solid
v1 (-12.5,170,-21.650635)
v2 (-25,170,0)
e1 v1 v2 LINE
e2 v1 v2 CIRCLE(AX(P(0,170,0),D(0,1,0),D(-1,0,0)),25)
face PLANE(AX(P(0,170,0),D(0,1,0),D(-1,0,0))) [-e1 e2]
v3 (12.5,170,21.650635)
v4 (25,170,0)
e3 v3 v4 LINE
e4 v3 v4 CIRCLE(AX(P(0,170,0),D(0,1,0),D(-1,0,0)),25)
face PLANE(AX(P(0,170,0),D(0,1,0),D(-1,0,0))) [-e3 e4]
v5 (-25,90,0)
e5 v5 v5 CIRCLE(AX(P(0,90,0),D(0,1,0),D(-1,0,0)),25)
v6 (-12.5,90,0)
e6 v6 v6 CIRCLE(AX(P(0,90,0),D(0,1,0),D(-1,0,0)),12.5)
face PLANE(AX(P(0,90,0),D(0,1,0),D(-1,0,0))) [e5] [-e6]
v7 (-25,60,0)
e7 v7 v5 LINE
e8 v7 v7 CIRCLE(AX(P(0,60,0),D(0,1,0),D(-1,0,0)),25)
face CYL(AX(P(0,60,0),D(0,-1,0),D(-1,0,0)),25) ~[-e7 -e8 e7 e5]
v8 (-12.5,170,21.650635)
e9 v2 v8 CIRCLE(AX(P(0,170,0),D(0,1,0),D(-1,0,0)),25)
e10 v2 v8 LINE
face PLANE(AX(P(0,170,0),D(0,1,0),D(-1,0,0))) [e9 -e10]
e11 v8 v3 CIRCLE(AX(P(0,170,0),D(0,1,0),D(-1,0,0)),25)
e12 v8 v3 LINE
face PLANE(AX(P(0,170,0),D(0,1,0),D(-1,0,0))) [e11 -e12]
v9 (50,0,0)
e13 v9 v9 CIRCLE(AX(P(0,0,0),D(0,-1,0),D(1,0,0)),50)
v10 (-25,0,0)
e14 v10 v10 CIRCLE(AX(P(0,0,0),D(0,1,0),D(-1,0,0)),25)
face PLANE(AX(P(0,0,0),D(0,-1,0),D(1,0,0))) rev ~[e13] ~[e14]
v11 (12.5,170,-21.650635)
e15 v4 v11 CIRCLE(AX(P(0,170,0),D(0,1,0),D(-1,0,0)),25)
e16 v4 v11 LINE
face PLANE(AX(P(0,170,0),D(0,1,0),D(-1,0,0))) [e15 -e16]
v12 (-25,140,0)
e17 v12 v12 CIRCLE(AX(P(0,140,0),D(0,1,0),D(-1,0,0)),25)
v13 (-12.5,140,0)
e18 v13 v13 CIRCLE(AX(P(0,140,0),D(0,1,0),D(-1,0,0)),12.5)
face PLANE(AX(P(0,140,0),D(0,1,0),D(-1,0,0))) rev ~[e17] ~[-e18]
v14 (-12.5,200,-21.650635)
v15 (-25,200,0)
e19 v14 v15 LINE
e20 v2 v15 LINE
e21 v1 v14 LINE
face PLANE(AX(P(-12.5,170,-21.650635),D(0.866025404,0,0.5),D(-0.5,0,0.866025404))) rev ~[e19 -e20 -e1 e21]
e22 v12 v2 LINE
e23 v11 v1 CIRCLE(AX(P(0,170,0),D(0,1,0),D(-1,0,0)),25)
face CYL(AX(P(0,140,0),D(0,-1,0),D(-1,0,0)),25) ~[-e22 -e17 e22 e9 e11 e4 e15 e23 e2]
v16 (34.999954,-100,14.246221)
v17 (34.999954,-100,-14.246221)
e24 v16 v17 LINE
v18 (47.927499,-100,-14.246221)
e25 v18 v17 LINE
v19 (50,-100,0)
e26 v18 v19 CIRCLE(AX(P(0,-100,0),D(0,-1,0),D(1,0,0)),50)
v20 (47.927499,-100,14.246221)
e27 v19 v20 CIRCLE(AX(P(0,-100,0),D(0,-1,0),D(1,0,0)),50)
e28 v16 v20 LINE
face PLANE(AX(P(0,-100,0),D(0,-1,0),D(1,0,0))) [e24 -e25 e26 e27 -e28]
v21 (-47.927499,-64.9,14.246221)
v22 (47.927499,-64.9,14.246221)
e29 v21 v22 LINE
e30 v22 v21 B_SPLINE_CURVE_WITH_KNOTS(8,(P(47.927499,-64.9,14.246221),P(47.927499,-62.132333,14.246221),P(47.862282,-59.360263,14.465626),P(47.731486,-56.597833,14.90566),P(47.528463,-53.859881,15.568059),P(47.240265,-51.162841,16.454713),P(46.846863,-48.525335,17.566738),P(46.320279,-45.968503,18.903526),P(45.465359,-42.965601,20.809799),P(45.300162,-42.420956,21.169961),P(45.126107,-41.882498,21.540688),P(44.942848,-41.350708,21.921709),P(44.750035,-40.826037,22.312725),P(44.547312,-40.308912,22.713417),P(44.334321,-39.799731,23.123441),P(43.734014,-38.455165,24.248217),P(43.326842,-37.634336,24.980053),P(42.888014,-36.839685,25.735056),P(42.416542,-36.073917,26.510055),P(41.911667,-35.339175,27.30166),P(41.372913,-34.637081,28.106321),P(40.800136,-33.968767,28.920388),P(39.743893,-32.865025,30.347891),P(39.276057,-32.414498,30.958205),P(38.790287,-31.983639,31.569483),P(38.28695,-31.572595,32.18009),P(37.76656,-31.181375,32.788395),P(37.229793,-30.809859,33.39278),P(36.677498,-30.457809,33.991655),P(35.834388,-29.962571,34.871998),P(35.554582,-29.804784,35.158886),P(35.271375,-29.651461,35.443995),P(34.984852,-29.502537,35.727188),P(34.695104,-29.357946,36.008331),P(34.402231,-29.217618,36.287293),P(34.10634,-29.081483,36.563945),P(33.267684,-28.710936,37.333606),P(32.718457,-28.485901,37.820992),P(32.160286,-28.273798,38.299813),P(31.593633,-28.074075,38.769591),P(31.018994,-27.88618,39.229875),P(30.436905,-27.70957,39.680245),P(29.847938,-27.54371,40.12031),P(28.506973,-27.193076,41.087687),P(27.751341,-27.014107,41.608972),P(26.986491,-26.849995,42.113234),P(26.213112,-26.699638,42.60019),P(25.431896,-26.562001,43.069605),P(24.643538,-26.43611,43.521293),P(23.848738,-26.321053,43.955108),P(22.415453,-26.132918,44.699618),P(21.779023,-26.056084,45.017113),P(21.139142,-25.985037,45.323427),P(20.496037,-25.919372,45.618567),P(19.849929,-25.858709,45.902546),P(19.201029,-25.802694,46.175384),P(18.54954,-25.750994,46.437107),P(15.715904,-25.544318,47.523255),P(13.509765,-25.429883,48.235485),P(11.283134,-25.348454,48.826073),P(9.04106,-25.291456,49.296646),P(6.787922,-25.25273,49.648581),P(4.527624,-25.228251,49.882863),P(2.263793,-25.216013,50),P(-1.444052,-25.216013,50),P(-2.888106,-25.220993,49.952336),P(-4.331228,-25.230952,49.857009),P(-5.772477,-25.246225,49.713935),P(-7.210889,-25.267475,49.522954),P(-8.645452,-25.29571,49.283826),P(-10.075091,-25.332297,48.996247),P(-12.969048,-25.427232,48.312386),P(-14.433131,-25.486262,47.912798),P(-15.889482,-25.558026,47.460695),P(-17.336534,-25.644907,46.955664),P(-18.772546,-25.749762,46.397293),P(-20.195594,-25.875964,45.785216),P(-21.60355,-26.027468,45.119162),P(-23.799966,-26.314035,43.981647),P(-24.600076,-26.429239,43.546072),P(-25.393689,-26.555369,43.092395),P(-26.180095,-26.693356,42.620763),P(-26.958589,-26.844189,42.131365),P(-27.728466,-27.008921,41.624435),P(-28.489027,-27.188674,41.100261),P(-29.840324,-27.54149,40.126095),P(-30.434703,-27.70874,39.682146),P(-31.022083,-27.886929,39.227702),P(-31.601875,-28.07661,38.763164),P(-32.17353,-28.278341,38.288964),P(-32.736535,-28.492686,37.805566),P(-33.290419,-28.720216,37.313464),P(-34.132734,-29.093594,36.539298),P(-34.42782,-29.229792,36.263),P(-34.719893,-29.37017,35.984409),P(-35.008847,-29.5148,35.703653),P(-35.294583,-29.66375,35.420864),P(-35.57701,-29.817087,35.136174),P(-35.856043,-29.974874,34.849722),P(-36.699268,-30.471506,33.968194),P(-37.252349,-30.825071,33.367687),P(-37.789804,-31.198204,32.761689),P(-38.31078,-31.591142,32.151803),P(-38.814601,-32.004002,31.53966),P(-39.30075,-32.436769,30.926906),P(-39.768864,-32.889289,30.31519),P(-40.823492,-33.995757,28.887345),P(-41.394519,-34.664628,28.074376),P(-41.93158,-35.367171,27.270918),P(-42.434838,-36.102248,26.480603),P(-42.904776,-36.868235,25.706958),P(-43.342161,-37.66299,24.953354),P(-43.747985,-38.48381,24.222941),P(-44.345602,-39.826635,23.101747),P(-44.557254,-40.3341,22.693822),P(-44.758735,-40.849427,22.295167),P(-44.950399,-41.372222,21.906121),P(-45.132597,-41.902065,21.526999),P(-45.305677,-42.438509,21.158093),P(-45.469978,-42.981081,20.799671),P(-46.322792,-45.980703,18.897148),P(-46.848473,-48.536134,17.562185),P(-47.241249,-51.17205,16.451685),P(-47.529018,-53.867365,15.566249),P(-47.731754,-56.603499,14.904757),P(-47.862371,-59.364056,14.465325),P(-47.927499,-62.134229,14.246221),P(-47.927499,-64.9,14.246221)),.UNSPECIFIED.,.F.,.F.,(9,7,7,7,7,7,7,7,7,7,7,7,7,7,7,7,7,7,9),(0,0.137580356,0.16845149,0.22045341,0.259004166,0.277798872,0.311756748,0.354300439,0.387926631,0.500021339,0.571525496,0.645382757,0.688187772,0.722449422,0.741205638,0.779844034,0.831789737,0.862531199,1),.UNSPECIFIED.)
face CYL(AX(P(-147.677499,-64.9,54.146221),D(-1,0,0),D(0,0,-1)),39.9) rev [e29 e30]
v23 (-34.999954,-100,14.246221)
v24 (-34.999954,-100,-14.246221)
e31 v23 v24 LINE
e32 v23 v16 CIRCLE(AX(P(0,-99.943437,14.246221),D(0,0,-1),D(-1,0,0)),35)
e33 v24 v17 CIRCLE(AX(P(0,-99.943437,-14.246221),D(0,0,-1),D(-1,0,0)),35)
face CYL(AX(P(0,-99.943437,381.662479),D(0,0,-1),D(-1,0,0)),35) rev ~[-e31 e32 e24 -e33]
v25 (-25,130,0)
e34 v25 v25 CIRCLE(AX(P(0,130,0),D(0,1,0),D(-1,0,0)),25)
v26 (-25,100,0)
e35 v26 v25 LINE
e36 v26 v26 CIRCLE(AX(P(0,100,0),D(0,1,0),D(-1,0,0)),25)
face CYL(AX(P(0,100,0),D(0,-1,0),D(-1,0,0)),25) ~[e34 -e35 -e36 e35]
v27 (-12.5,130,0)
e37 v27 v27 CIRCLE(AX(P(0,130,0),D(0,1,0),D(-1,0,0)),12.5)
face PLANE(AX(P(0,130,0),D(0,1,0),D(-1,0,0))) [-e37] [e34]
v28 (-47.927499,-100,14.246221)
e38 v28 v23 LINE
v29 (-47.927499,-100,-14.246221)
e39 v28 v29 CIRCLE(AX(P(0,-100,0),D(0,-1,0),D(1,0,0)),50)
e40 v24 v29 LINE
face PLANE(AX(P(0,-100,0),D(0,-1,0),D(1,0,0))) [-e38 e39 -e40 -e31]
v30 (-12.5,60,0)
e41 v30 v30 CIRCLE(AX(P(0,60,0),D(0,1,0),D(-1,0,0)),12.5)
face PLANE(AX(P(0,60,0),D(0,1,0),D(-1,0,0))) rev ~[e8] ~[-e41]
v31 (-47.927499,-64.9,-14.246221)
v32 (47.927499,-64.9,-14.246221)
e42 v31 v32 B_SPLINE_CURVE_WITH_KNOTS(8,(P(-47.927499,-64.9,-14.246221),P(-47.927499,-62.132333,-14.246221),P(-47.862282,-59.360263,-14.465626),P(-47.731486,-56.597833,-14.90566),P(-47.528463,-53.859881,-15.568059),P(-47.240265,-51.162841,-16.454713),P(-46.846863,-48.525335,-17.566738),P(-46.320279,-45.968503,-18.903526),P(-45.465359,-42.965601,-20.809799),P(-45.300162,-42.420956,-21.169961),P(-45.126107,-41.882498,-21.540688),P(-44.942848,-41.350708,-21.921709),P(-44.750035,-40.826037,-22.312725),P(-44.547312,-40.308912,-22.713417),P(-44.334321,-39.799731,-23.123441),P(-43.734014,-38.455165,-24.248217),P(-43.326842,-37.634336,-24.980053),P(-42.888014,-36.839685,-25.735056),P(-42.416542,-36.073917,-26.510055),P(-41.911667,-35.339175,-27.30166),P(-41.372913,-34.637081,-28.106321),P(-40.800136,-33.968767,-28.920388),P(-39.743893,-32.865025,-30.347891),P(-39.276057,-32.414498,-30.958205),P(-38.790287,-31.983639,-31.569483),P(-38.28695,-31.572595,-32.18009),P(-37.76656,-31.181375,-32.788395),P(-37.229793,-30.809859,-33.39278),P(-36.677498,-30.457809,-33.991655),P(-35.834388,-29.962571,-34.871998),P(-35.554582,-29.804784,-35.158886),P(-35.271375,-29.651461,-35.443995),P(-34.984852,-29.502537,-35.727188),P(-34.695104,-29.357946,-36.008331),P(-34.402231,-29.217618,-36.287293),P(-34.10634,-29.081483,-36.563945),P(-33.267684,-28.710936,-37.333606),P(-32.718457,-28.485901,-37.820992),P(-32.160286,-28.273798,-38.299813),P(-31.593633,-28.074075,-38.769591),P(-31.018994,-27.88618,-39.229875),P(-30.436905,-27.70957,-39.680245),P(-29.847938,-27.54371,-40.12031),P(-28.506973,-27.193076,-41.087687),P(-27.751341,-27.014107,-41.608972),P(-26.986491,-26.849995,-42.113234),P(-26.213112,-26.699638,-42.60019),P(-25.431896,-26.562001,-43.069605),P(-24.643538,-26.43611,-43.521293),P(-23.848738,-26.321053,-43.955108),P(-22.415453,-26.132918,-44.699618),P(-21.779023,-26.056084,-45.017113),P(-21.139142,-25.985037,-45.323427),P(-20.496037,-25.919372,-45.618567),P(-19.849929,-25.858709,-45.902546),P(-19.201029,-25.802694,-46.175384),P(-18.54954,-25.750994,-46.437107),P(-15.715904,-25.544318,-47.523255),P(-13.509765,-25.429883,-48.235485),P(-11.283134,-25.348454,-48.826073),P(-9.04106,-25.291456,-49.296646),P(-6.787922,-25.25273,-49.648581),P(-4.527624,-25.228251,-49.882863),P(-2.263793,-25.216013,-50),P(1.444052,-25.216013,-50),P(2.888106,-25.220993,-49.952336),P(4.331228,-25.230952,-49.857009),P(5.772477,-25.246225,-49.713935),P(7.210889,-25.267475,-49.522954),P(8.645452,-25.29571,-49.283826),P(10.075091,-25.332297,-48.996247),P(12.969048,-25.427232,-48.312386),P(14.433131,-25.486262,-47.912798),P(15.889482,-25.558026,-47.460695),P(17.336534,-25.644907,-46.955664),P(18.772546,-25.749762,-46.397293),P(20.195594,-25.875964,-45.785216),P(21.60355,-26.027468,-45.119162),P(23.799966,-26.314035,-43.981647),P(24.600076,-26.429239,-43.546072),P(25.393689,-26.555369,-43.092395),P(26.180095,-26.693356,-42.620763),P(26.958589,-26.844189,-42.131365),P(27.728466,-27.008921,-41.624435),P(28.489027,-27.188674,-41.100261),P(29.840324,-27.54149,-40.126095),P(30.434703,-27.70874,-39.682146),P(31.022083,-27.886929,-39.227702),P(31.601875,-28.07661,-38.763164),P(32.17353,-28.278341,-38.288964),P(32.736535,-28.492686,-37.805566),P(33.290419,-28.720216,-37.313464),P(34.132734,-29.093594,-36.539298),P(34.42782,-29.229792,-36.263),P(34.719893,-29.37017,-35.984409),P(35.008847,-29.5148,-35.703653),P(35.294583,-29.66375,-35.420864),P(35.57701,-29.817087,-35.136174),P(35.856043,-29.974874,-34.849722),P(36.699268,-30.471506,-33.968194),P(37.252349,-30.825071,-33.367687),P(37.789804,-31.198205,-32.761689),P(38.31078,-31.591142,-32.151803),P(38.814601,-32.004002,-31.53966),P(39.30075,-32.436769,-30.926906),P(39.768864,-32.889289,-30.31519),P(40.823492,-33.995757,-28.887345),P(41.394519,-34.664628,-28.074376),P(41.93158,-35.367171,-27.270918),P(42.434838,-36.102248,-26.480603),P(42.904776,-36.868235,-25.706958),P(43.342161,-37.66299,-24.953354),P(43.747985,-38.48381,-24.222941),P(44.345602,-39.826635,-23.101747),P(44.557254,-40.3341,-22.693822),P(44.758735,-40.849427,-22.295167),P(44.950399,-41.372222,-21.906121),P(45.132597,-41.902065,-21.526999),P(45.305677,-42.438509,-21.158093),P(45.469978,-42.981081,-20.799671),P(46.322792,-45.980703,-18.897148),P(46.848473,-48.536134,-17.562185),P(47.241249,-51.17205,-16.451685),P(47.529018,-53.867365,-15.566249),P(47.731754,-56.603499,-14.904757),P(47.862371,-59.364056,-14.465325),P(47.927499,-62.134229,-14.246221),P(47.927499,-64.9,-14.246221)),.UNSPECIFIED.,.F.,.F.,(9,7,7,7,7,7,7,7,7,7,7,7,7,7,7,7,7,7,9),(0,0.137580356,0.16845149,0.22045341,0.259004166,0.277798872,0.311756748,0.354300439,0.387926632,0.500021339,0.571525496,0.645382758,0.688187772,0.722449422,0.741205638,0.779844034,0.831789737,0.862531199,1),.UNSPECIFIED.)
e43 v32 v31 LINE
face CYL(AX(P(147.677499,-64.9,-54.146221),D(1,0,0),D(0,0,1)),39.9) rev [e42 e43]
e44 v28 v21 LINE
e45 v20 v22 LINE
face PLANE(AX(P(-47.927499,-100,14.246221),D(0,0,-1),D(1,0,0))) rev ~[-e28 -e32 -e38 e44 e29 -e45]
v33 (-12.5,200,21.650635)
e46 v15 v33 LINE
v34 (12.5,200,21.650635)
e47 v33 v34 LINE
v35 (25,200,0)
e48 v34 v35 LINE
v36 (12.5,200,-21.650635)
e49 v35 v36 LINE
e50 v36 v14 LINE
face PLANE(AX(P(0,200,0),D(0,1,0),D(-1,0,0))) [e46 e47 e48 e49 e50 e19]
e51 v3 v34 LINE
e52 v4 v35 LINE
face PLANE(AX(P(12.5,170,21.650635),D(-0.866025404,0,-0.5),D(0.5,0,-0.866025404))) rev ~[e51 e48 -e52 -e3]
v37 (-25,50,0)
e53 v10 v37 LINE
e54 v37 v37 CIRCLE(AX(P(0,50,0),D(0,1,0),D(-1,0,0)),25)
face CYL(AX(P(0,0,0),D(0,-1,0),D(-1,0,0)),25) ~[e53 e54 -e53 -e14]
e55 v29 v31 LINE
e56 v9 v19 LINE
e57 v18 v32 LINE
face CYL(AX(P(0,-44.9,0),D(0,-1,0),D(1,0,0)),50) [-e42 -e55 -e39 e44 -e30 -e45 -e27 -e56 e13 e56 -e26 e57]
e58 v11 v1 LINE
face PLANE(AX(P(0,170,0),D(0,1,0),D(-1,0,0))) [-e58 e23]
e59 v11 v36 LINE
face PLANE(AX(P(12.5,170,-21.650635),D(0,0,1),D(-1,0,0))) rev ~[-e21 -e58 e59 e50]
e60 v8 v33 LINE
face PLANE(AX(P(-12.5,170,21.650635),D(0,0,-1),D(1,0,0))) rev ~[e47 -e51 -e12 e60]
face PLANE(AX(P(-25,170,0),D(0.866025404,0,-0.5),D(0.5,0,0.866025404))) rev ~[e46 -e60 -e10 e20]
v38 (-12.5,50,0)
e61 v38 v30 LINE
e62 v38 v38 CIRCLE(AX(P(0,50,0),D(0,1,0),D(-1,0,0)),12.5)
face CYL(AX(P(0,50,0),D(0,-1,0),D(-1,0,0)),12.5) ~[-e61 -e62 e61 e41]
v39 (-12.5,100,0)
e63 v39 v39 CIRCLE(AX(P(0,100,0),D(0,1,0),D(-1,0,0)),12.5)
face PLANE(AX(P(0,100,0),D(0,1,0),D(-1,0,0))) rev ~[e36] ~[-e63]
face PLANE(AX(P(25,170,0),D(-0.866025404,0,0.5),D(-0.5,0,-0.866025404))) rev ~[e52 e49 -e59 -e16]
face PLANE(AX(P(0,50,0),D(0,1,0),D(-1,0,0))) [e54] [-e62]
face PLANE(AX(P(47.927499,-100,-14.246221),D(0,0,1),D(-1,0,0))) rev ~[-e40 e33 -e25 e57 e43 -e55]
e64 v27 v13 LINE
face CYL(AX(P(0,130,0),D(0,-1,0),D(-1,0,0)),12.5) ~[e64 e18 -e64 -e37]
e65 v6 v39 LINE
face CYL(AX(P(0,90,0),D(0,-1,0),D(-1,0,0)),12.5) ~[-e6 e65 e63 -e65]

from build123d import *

# Parameters (mm, degrees)
F0_R          = 50
F1_DEPTH      = 100
F2_R          = 25
F3_DEPTH      = 50
F4_R          = 12.5
F5_DEPTH      = 10
F6_R          = 25
F7_DEPTH      = 30
F8_R          = 12.5
F9_DEPTH      = 10
F10_R         = 25
F11_DEPTH     = 30
F12_R         = 12.5
F13_DEPTH     = 10
F14_R         = 25
F15_DEPTH     = 30
F17_DEPTH     = 30
F20_D         = 70
F22_DEPTH     = 75
F23_T4_DEPTH  = 295.3549985752
F23_S5_R      = 50
F23_T6_DEPTH  = 152
F23_T10_DEPTH = 295.3549985752
F23_S11_R     = 50
F23_T12_DEPTH = 152


# Not quite as in the source:
# - a fillet or chamfer that OpenCascade refuses, or shapes differently, is made with other operations: its cross-section is extruded or revolved along the edge and cut away or added


with BuildPart() as f1:
    # F0 (on Front) → F1 (new body)
    with BuildSketch(Plane.XZ):
        Circle(F0_R)
    extrude(amount=F1_DEPTH)

    # F2 (on face) → F3 (join)
    with BuildSketch(Plane(origin=(0, 0, 0), x_dir=(-1, 0, 0), z_dir=(0, 1, 0))):
        Circle(F2_R)
    extrude(amount=F3_DEPTH)

    # F4 (on face) → F5 (join)
    with BuildSketch(Plane(origin=(0, 50, 0), x_dir=(-1, 0, 0), z_dir=(0, 1, 0))):
        Circle(F4_R)
    extrude(amount=F5_DEPTH)

    # F6 (on face) → F7 (join)
    with BuildSketch(Plane(origin=(0, 60, 0), x_dir=(-1, 0, 0), z_dir=(0, 1, 0))):
        Circle(F6_R)
    extrude(amount=F7_DEPTH)

    # F8 (on face) → F9 (join)
    with BuildSketch(Plane(origin=(0, 90, 0), x_dir=(-1, 0, 0), z_dir=(0, 1, 0))):
        Circle(F8_R)
    extrude(amount=F9_DEPTH)

    # F10 (on face) → F11 (join)
    with BuildSketch(Plane(origin=(0, 100, 0), x_dir=(-1, 0, 0), z_dir=(0, 1, 0))):
        Circle(F10_R)
    extrude(amount=F11_DEPTH)

    # F12 (on face) → F13 (join)
    with BuildSketch(Plane(origin=(0, 130, 0), x_dir=(-1, 0, 0), z_dir=(0, 1, 0))):
        Circle(F12_R)
    extrude(amount=F13_DEPTH)

    # F14 (on face) → F15 (join)
    with BuildSketch(Plane(origin=(0, 140, 0), x_dir=(-1, 0, 0), z_dir=(0, 1, 0))):
        Circle(F14_R)
    extrude(amount=F15_DEPTH)

    # F16 (on face) → F17 (join)
    with BuildSketch(Plane(origin=(0, 170, 0), x_dir=(-1, 0, 0), z_dir=(0, 1, 0))):
        Polygon((12.5, -21.6506350946), (25, 0), (12.5, 21.6506350946), (-12.5, 21.6506350946), (-25, 0), (-12.5, -21.6506350946), align=None)
    extrude(amount=F17_DEPTH)

    # F20 (through all)
    with Locations(Plane.XY.offset(50)):
        with Locations((0, -99.9434366822)):
            Hole(F20_D / 2)

    # F21 (on face) → F22 (cut)
    with BuildSketch(Plane.XZ.offset(100)):
        with BuildLine():
            ThreePointArc((47.9274992876, 14.2462209739), (0, 50), (-47.9274992876, 14.2462209739))
            Line((-47.9274992876, 14.2462209739), (47.9274992876, 14.2462209739))
        make_face()
        with BuildLine():
            Line((47.9274992876, -14.2462209739), (-47.9274992876, -14.2462209739))
            ThreePointArc((-47.9274992876, -14.2462209739), (0, -50), (47.9274992876, -14.2462209739))
        make_face()
    extrude(amount=-F22_DEPTH, mode=Mode.SUBTRACT)

    # F23: fillet of radius 39.9 on 2 edges, made by hand


with BuildPart() as f23_tool2:
    # F23_s3 → F23_t4 (new body)
    with BuildSketch(Plane.YZ.offset(-147.6774992876)):
        with BuildLine():
            ThreePointArc((-64.9, 14.2462209739), (-36.6864394307, 25.9326604046), (-25, 54.1462209739))
            Line((-25, 54.1462209739), (-25, 14.2462209739))
            Line((-25, 14.2462209739), (-64.9, 14.2462209739))
        make_face()
    extrude(amount=F23_T4_DEPTH)

    # F23_s5 → F23_t6 (intersect, symmetric)
    with BuildSketch(Plane.XZ.offset(44.9)):
        Circle(F23_S5_R)
    extrude(amount=F23_T6_DEPTH, both=True, mode=Mode.INTERSECT)


with BuildPart() as f1_1:
    add(f1.part)

    # F23_t1: union F23_tool2
    add(f23_tool2.part)


with BuildPart() as f23_tool8:
    # F23_s9 → F23_t10 (new body)
    with BuildSketch(Plane.YZ.offset(147.6774992876)):
        with BuildLine():
            ThreePointArc((-64.9, -14.2462209739), (-36.6864394307, -25.9326604046), (-25, -54.1462209739))
            Line((-25, -54.1462209739), (-25, -14.2462209739))
            Line((-25, -14.2462209739), (-64.9, -14.2462209739))
        make_face()
    extrude(amount=-F23_T10_DEPTH)

    # F23_s11 → F23_t12 (intersect, symmetric)
    with BuildSketch(Plane.XZ.offset(44.9)):
        Circle(F23_S11_R)
    extrude(amount=F23_T12_DEPTH, both=True, mode=Mode.INTERSECT)


with BuildPart() as f1_2:
    add(f1_1.part)

    # F23_t7: union F23_tool8
    add(f23_tool8.part)


solid = f1_2.part
